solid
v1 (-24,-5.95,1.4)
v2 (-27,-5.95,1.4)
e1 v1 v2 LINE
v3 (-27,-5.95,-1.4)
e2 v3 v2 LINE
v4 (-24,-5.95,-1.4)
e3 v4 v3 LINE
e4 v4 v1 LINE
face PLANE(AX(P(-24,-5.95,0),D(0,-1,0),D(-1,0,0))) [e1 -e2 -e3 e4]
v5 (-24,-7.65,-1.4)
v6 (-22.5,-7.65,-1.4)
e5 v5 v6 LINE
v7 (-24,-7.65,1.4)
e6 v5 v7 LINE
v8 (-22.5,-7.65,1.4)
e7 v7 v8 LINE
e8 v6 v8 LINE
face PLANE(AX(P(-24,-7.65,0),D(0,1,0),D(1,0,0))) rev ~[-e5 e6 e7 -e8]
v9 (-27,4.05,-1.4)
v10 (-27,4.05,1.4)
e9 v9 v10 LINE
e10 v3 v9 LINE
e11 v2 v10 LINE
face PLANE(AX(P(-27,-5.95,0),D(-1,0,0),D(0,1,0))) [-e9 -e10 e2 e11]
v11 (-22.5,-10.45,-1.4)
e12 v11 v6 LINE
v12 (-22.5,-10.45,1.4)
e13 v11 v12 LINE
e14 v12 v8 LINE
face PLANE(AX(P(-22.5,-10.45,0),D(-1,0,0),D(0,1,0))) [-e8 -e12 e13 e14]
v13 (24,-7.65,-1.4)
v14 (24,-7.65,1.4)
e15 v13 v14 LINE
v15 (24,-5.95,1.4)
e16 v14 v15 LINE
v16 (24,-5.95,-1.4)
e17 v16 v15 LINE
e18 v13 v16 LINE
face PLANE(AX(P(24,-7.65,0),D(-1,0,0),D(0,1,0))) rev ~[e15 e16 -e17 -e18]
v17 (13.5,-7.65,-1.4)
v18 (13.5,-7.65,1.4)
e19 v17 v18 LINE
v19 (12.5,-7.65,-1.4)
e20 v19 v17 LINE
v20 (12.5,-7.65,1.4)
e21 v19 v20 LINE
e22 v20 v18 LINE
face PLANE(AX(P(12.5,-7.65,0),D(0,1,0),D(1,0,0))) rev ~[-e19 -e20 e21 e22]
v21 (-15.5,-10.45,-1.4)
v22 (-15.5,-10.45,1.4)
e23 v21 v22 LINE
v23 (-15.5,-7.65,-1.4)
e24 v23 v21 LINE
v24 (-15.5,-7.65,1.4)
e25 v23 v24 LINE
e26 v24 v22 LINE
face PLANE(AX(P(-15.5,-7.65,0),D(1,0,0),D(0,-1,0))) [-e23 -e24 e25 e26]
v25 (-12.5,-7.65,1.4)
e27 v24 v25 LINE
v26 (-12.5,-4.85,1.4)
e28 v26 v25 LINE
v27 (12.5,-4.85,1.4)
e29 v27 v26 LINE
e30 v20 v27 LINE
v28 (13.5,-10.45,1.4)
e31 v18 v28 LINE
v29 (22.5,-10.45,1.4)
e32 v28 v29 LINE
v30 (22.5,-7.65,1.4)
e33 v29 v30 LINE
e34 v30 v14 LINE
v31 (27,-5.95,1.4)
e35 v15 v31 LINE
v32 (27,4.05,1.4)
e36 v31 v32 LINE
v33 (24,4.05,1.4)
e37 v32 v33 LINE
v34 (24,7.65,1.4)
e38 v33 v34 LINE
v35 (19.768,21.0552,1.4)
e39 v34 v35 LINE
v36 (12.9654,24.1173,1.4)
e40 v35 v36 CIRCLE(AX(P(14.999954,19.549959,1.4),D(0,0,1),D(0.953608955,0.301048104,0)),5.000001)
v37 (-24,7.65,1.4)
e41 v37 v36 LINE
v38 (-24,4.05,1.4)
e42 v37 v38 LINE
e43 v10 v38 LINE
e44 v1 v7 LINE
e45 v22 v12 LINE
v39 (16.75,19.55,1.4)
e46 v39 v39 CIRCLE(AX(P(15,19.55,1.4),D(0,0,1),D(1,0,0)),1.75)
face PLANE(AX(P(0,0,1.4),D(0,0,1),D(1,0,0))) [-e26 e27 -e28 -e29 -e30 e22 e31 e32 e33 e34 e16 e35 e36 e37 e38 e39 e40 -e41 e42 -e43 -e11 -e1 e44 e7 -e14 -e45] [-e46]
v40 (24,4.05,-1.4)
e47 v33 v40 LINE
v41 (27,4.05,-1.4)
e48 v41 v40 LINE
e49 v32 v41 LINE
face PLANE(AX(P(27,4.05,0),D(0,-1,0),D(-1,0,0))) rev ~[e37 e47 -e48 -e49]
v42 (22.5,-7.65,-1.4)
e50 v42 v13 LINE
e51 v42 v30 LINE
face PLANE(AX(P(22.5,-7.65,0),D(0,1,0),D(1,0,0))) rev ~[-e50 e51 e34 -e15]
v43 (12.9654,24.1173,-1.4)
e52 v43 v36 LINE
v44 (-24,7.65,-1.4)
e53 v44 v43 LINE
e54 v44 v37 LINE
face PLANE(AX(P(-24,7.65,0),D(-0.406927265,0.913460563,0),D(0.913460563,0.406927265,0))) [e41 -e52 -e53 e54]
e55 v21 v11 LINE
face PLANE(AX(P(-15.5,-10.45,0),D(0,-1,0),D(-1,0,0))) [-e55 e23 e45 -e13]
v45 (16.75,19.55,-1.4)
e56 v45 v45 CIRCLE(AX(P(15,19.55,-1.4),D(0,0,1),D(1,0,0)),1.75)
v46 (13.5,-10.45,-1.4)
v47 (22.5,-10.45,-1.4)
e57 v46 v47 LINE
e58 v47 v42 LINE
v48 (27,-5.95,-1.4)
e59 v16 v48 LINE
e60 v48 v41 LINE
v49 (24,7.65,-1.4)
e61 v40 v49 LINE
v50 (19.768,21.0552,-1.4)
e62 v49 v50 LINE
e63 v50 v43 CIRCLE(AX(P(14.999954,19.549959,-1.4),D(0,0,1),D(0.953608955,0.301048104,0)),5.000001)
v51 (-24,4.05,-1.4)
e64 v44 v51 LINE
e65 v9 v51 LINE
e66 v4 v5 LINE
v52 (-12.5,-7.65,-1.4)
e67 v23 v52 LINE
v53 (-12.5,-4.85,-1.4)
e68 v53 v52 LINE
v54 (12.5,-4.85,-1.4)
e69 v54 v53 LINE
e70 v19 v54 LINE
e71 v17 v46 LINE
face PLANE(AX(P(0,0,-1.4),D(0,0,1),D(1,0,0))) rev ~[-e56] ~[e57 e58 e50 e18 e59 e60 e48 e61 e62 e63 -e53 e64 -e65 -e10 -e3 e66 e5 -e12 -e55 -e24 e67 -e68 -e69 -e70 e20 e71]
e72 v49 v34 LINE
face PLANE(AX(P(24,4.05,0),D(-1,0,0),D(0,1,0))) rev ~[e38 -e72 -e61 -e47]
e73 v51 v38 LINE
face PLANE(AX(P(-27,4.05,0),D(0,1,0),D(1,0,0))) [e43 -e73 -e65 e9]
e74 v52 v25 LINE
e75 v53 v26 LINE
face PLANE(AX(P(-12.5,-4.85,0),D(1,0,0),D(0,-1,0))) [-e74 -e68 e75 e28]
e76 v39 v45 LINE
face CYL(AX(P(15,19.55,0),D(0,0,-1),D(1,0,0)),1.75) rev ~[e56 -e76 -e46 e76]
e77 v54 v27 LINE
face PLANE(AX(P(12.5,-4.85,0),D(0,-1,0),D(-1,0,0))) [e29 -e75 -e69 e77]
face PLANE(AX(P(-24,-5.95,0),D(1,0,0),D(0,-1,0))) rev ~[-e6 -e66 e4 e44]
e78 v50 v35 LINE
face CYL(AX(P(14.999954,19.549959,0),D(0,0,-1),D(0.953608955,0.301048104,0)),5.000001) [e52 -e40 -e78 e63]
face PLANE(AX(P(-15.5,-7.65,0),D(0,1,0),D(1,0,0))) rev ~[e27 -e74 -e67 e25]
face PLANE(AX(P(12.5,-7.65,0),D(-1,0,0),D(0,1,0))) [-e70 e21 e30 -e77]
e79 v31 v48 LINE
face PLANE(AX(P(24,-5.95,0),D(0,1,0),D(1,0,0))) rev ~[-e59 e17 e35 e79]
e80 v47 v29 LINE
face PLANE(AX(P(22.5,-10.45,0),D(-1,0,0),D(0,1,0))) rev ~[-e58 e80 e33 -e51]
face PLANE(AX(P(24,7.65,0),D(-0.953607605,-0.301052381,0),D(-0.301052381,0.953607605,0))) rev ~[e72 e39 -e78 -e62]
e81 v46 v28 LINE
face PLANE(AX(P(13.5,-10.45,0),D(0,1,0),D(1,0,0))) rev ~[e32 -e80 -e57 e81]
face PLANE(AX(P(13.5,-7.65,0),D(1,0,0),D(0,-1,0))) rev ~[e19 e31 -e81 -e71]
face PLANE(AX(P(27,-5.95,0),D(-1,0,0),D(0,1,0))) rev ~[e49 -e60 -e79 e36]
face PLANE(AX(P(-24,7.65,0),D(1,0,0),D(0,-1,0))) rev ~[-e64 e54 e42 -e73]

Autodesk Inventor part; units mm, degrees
ref_plane "YZ Plane" through (0, 0, 0) normal (1, 0, 0) x (0, 1, 0)
ref_plane "XZ Plane" through (0, 0, 0) normal (0, 1, 0) x (-1, 0, 0)
ref_plane "XY Plane" through (0, 0, 0) normal (0, 0, 1) x (1, 0, 0)
sketch "Sketch1" plane through (0, 0, 0) normal (0, 0, 1) x (1, 0, 0)
  line L0 (24, 7.65) -> (-24, 7.65)
  line L1 (-24, 7.65) -> (-24, -7.65)
  line L2 (-24, -7.65) -> (24, -7.65)
  line L3 (24, -7.65) -> (24, 7.65)
  line L4 (24, 7.65) -> (-24, -7.65) construction
  line L5 (-24, 7.65) -> (24, -7.65) construction
  line L6 (-22.5, -7.65) -> (-15.5, -7.65)
  line L7 (-15.5, -7.65) -> (-15.5, -10.45)
  line L8 (-15.5, -10.45) -> (-22.5, -10.45)
  line L9 (-22.5, -10.45) -> (-22.5, -7.65)
  line L10 (22.5, -7.65) -> (13.5, -7.65)
  line L11 (13.5, -7.65) -> (13.5, -10.45)
  line L12 (13.5, -10.45) -> (22.5, -10.45)
  line L13 (22.5, -10.45) -> (22.5, -7.65)
  line L14 (24, -5.95) -> (27, -5.95)
  line L15 (27, -5.95) -> (27, 4.05)
  line L16 (27, 4.05) -> (24, 4.05)
  line L17 (24, 4.05) -> (24, -5.95)
  line L18 (-24, -5.95) -> (-27, -5.95)
  line L19 (-27, -5.95) -> (-27, 4.05)
  line L20 (-27, 4.05) -> (-24, 4.05)
  line L21 (-24, 4.05) -> (-24, -5.95)
  line L22 (-12.5, -7.65) -> (12.5, -7.65)
  line L23 (12.5, -7.65) -> (12.5, -4.85)
  line L24 (12.5, -4.85) -> (-12.5, -4.85)
  line L25 (-12.5, -4.85) -> (-12.5, -7.65)
  circle A0 centre (15, 19.55) radius 1.75
  arc A1 (19.768, 21.0552) -> (12.9654, 24.1173) centre (15, 19.55) ccw
  line L26 (-24, 7.65) -> (12.9654, 24.1173)
  line L27 (24, 7.65) -> (19.768, 21.0552)
  point P0 (0, 0)
  point P1 (-25.5, -5.95)
  point P2 (25.5, -5.95)
  point P3 (25.5, 4.05)
  point P4 (-25.5, 4.05)
  point P5 (0, -4.85)
  point P6 (0, 0)
  dimension "d0" = 48
  dimension "d1" = 15.3
  dimension "d2" = 3.5
  dimension "d3" = 30
  dimension "d4" = 2.8
  dimension "d5" = 12
  dimension "d6" = 3
  dimension "d7" = 4.5
  dimension "d8" = 10
  dimension "d9" = 25
  dimension "d10" = 7
  dimension "d11" = 9
  dimension "d12" = 4.5
  dimension "d13" = 4.5
  dimension "d14" = 10
extrude "Extrusion1" add sketch "Sketch1" along normal mid plane 2.8 contours L3 L2 L23 L24 L25 L1 L0 | L0 L26 A1 L27 | L16 L15 L14 L3 | L1 L18 L19 L20 | L13 L12 L11 L2 | L2 L7 L8 L9
